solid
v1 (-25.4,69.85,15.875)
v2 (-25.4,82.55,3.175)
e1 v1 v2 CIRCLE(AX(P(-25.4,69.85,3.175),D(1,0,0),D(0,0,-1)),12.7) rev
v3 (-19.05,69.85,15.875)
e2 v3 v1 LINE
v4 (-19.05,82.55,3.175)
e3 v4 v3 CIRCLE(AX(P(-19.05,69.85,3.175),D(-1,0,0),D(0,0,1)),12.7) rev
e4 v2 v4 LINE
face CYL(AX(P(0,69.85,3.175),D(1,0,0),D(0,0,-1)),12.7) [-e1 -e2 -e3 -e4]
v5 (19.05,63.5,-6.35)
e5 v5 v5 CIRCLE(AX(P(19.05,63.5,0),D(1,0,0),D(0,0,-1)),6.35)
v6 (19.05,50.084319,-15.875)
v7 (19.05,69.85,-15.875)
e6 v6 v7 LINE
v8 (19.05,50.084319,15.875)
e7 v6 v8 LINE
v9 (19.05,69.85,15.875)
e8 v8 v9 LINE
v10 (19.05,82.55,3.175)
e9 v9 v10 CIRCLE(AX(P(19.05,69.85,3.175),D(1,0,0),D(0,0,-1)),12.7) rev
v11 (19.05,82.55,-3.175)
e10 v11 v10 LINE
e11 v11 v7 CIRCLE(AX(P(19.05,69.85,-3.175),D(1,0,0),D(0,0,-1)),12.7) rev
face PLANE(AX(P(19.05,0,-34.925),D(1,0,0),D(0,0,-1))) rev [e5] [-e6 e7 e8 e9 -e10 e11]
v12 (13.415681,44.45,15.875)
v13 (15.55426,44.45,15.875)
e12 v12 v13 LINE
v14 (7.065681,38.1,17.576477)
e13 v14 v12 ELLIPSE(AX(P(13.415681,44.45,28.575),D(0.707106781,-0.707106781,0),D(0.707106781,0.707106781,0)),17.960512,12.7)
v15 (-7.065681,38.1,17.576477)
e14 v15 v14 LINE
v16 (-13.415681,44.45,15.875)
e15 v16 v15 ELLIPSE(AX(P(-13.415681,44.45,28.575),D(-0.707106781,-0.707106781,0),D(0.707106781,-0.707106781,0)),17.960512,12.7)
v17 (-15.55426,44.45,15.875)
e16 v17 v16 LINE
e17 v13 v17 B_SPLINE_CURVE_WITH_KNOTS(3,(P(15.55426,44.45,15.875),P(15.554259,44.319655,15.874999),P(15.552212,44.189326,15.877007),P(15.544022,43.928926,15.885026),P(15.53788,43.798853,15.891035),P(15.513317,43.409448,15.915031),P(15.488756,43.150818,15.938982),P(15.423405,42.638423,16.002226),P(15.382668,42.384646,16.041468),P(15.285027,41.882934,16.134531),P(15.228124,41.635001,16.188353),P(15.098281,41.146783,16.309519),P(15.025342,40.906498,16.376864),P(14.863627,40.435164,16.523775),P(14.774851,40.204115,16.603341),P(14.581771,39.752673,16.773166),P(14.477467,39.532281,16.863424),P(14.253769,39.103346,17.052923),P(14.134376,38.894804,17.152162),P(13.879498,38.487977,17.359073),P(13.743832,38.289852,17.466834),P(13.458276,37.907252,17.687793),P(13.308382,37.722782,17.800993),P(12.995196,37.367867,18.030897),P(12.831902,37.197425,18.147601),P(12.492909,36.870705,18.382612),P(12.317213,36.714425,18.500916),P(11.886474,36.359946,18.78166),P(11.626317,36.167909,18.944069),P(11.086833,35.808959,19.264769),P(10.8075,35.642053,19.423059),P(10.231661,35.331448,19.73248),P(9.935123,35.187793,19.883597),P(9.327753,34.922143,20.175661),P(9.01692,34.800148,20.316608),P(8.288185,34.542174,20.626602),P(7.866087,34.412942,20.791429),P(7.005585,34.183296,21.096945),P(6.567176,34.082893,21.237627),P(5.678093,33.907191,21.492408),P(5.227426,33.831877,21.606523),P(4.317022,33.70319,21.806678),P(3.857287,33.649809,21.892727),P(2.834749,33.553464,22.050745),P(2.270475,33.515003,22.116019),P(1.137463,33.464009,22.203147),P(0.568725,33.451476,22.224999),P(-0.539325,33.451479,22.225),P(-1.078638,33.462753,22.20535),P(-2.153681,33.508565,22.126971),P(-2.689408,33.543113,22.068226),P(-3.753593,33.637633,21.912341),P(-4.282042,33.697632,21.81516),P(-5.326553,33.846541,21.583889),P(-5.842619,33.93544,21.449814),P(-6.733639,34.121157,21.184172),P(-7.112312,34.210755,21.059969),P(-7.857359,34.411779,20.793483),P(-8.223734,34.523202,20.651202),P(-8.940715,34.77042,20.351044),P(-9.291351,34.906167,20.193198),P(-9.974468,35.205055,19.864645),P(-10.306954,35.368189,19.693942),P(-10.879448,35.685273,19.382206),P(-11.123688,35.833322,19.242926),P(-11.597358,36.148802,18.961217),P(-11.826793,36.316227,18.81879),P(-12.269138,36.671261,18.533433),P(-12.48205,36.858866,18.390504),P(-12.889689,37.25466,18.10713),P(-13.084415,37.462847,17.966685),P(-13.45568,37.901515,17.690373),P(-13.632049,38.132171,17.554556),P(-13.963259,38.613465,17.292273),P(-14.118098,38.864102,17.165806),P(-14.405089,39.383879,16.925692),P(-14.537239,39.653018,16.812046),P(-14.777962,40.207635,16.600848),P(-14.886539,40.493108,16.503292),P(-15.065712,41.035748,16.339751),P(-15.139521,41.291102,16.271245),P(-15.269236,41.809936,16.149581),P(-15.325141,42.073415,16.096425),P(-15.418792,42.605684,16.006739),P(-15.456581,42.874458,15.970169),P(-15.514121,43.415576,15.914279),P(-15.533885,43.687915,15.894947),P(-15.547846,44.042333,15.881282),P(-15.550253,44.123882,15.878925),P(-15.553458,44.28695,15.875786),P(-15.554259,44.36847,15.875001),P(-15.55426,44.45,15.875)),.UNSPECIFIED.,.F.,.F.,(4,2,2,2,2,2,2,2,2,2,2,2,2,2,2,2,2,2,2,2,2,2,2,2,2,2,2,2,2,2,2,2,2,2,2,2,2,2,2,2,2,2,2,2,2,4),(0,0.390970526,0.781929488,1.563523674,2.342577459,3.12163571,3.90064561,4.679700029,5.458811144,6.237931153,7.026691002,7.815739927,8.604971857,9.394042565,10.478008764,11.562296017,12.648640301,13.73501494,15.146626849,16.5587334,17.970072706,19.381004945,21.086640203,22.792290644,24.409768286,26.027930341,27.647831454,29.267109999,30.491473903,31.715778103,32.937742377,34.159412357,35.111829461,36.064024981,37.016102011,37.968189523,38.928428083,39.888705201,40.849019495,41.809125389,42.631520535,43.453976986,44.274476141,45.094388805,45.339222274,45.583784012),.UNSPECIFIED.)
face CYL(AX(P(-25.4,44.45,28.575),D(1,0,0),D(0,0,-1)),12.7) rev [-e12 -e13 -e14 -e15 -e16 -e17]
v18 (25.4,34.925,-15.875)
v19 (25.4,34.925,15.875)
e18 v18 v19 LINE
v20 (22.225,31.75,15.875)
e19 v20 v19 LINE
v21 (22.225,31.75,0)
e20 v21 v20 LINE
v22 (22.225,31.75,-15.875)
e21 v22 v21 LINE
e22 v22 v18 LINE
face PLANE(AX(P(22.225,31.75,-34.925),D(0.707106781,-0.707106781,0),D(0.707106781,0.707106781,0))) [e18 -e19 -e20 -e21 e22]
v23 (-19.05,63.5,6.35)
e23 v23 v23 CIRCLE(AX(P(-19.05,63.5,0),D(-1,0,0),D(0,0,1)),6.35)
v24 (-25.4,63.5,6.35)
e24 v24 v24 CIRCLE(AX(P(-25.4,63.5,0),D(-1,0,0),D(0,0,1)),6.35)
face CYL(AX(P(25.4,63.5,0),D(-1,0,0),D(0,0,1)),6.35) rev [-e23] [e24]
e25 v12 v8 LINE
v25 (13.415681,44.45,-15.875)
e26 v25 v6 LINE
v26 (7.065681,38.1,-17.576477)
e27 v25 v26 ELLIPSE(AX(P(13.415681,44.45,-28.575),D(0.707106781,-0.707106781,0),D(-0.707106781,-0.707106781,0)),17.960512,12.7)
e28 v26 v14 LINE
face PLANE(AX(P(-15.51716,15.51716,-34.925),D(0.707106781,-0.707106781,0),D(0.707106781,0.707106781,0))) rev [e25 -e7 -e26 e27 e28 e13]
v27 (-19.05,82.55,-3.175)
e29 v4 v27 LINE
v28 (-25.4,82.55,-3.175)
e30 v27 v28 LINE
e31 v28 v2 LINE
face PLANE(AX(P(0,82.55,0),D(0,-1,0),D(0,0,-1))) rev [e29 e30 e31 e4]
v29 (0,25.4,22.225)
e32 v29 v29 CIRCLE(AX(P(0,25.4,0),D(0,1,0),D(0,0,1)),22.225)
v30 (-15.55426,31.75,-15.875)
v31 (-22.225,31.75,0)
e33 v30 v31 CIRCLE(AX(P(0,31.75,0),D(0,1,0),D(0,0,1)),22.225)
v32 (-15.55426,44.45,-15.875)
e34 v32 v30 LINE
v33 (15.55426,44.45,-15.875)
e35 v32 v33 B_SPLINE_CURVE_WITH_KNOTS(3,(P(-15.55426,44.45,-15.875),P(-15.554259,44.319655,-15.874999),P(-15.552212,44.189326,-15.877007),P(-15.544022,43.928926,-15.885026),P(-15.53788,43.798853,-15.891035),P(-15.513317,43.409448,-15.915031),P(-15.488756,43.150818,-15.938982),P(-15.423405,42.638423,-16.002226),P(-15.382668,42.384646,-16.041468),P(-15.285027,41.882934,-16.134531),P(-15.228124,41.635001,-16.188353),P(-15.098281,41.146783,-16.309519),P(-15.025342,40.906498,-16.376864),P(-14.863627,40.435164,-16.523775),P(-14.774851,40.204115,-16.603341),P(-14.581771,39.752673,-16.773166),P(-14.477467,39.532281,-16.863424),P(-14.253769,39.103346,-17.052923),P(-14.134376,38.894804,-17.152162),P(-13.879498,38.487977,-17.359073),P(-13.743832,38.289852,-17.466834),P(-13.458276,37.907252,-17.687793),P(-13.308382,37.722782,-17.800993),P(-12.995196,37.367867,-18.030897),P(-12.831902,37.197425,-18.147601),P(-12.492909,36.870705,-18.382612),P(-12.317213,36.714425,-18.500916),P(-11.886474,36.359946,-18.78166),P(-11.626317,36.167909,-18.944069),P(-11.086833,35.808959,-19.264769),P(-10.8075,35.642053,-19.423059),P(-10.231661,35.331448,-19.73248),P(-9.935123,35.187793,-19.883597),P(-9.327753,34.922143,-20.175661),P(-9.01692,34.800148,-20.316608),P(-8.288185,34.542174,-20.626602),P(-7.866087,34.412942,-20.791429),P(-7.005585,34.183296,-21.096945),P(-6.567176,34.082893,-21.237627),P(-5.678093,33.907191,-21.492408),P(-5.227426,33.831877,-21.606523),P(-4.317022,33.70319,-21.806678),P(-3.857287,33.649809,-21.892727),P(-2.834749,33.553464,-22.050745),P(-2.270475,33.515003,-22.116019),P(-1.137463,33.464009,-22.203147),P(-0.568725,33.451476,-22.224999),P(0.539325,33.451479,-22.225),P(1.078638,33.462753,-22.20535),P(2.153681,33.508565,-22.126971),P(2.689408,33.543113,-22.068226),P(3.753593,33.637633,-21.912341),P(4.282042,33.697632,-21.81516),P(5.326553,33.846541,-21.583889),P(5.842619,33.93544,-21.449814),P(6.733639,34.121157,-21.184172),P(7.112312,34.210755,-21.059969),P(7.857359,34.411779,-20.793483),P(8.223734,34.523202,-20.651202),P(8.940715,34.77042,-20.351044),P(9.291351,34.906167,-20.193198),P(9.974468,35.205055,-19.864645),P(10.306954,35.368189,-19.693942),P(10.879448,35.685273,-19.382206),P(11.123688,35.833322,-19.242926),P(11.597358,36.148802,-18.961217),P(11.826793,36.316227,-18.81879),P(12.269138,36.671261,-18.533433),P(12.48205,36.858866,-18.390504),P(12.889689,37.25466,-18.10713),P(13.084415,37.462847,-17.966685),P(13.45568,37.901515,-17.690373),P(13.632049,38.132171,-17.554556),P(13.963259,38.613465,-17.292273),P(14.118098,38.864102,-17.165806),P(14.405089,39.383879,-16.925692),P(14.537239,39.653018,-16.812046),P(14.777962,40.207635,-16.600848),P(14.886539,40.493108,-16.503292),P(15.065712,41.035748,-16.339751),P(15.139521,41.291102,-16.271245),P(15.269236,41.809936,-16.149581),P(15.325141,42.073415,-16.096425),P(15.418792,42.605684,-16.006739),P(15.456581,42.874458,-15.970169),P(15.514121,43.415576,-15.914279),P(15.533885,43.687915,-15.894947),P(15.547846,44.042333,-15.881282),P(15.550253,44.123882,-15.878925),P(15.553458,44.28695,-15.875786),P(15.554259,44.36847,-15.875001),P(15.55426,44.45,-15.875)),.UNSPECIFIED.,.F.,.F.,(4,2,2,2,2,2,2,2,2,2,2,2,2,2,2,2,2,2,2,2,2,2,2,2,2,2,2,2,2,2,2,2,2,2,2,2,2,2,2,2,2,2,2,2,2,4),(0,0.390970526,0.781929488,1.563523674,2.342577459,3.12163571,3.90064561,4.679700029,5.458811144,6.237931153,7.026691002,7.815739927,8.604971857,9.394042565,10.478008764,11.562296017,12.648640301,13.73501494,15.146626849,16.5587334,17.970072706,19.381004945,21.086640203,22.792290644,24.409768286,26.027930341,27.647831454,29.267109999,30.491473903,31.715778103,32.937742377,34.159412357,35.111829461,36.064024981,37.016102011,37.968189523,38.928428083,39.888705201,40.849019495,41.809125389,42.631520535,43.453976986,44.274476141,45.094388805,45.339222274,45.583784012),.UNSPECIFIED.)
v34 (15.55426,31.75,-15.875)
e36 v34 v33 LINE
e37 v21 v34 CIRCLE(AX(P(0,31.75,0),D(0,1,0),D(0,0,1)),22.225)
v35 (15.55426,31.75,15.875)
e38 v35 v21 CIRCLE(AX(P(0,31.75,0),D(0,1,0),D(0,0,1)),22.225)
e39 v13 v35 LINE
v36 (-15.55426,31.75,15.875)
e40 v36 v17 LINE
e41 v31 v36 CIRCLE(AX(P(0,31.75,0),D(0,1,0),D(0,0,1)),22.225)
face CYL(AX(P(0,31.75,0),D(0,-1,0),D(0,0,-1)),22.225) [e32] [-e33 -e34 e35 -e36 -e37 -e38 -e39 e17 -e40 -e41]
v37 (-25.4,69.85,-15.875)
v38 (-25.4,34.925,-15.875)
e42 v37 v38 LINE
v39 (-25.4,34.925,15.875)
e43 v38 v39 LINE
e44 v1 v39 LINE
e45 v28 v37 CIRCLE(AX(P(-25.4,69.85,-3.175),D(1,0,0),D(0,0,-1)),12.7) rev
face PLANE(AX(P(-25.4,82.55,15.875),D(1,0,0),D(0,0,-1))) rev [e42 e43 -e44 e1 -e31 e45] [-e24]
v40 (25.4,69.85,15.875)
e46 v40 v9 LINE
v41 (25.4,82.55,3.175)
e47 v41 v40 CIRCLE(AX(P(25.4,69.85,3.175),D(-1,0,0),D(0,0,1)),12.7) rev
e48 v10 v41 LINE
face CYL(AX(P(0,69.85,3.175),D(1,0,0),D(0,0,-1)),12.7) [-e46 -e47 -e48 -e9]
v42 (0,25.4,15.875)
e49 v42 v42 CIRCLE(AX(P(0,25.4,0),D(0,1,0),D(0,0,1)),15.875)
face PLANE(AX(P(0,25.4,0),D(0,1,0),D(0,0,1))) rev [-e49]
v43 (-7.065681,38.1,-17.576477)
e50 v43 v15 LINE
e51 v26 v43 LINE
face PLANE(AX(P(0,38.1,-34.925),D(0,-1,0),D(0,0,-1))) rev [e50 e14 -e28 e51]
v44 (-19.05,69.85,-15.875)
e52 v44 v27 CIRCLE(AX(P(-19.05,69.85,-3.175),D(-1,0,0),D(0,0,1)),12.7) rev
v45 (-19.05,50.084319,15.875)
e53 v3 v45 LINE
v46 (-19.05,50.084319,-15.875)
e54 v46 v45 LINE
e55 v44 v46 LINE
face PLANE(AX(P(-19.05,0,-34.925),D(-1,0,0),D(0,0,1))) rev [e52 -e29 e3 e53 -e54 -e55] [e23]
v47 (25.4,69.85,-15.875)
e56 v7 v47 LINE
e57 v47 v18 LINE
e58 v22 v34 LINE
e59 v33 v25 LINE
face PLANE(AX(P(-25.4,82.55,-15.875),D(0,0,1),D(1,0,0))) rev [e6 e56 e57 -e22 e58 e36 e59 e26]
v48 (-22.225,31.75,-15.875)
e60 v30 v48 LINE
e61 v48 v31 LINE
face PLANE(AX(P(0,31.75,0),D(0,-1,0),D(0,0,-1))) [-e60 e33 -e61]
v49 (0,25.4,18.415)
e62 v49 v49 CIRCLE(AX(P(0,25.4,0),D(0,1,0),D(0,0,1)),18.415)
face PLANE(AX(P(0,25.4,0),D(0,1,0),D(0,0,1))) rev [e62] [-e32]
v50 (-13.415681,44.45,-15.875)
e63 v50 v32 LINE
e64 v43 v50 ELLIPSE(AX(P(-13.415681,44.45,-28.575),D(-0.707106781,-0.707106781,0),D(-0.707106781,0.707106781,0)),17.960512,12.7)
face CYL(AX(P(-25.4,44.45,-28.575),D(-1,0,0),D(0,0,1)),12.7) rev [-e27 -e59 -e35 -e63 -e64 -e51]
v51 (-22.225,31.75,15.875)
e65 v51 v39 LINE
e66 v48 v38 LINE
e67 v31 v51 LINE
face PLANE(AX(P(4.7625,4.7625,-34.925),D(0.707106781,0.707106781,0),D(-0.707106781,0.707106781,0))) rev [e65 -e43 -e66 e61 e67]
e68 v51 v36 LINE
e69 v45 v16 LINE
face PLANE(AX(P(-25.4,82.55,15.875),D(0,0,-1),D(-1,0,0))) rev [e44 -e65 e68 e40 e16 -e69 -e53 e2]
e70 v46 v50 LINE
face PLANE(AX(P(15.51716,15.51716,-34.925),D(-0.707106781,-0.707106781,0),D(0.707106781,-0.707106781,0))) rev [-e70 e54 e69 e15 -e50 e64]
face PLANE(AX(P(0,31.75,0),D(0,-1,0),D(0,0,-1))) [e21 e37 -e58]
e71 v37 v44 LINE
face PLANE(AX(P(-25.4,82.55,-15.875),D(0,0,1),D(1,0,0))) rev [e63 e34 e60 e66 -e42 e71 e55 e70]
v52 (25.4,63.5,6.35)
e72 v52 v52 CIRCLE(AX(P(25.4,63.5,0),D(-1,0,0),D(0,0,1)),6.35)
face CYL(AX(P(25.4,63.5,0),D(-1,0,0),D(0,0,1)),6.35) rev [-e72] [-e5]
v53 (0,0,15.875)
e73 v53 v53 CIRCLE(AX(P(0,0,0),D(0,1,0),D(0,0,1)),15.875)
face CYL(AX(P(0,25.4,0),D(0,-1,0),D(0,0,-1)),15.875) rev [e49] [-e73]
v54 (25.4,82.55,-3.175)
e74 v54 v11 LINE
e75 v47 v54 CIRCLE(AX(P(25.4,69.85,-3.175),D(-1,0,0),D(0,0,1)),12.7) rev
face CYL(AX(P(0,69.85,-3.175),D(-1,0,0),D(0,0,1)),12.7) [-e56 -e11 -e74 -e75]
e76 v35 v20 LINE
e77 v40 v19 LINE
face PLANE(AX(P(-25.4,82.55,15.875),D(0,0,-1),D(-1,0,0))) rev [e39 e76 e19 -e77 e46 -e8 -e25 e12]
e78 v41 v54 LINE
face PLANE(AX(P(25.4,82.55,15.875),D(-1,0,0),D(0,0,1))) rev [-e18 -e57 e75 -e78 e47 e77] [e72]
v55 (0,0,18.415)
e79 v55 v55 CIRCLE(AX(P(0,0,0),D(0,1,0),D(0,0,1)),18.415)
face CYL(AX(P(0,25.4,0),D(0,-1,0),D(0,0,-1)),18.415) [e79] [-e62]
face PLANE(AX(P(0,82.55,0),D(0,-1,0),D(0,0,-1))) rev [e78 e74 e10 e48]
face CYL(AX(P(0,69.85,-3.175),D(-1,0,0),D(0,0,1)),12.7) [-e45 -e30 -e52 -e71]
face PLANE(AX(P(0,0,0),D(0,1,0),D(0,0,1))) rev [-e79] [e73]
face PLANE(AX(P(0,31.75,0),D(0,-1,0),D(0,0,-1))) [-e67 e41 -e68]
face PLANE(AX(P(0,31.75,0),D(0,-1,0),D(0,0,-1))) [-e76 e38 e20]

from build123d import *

# Parameters (mm, degrees)
SKETCH2_R           = 18.415
SKETCH2_R_2         = 15.875
BOSS_EXTRUDE1_DEPTH = 25.4
SKETCH3_R           = 22.225
BOSS_EXTRUDE2_DEPTH = 6.35
SKETCH5_W           = 50.8
SKETCH5_H           = 31.75
BOSS_EXTRUDE3_DEPTH = 50.8
CUT_EXTRUDE2_DEPTH  = 50.8
FILLET1_R           = 12.7
SKETCH9_R           = 6.35
CUT_EXTRUDE3_DEPTH  = 100.443919497
FILLET2_R           = 12.7


with BuildPart() as part:
    # Sketch2 → Boss-Extrude1 (new body)
    with BuildSketch(Plane(origin=(0, 0, 0), x_dir=(1, 0, 0), z_dir=(0, 1, 0))):
        with Locations(Location((0, 0, 0), (0, 0, 270))):
            Circle(SKETCH2_R)
        with Locations(Location((0, 0, 0), (0, 0, 270))):
            Circle(SKETCH2_R_2, mode=Mode.SUBTRACT)
    extrude(amount=BOSS_EXTRUDE1_DEPTH)

    # Sketch3 → Boss-Extrude2 (add)
    with BuildSketch(Plane(origin=(0, 25.4, 0), x_dir=(1, 0, 0), z_dir=(0, 1, 0))):
        with Locations(Location((0, 0, 0), (0, 0, 270))):
            Circle(SKETCH3_R)
    extrude(amount=BOSS_EXTRUDE2_DEPTH)

    # Sketch5 → Boss-Extrude3 (add)
    with BuildSketch(Plane(origin=(0, 31.75, 0), x_dir=(1, 0, 0), z_dir=(0, 1, 0))):
        Rectangle(SKETCH5_W, SKETCH5_H)
    extrude(amount=BOSS_EXTRUDE3_DEPTH)

    # Sketch7 → Cut-Extrude2 (cut)
    with BuildSketch(Plane.XY.offset(15.875)):
        Polygon((19.05, 82.55), (-19.05, 82.55), (-19.05, 50.084319149), (-7.065680851, 38.1), (7.065680851, 38.1), (19.05, 50.084319149), align=None)
        Polygon((-22.225, 31.75), (-25.4, 34.925), (-25.4, 31.75), align=None)
        Polygon((22.225, 31.75), (25.4, 34.925), (25.4, 31.75), align=None)
    extrude(amount=-CUT_EXTRUDE2_DEPTH, mode=Mode.SUBTRACT)

    # Fillet1
    fillet1_edges = [part.edges().sort_by_distance(p)[0] for p in [
        (22.225, 82.55, -15.875),
        (-22.225, 82.55, 15.875),
        (-22.225, 82.55, -15.875),
        (22.225, 82.55, 15.875),
    ]]
    fillet(fillet1_edges, radius=FILLET1_R)

    # Sketch9 → Cut-Extrude3 (cut, through all)
    with BuildSketch(Plane.ZY.offset(25.4)):
        with Locations((0, 63.5)):
            Circle(SKETCH9_R)
    extrude(amount=-CUT_EXTRUDE3_DEPTH, mode=Mode.SUBTRACT)

    # Fillet2
    # the kernel refuses this fillet: 12.7 mm, written as the material it adds along each edge
    with BuildSketch(Plane(origin=(-47.304259867, 31.75, 15.875), x_dir=(0, 1, 0), z_dir=(1, 0, 0))) as fillet2_piece_1_section:
        with BuildLine():
            CenterArc((FILLET2_R, FILLET2_R), FILLET2_R, 180, 90)
            Line((0, FILLET2_R), (0, 0))
            Line((0, 0), (FILLET2_R, 0))
        make_face()
    fillet2_piece_1 = extrude(amount=94.608519733, mode=Mode.PRIVATE)
    fillet2_piece_1 = split(fillet2_piece_1, bisect_by=Plane(origin=(-10.08116257, 41.115481719, 16.394719063), z_dir=(-0.7071067811865479, -0.7071067811865472, 0)), keep=Keep.TOP, mode=Mode.PRIVATE)
    fillet2_piece_1 = fillet2_piece_1 & Plane(origin=(0, 39.477824878, 0), x_dir=(0, 0, 1), z_dir=(0, -1, 0)) * Cylinder(22.225, 241, mode=Mode.PRIVATE)
    add(fillet2_piece_1)
    with BuildSketch(Plane(origin=(-47.304259867, 31.75, 15.875), x_dir=(0, 1, 0), z_dir=(1, 0, 0))) as fillet2_piece_2_section:
        with BuildLine():
            CenterArc((FILLET2_R, FILLET2_R), FILLET2_R, 180, 90)
            Line((0, FILLET2_R), (0, 0))
            Line((0, 0), (FILLET2_R, 0))
        make_face()
    fillet2_piece_2 = extrude(amount=94.608519733, mode=Mode.PRIVATE)
    fillet2_piece_2 = split(fillet2_piece_2, bisect_by=Plane(origin=(1e-09, 38.1, 17.97624181), z_dir=(0, -1, 0)), keep=Keep.TOP, mode=Mode.PRIVATE)
    fillet2_piece_2 = fillet2_piece_2 & Plane(origin=(0, 35.120576784, 0), x_dir=(0, 0, 1), z_dir=(0, -1, 0)) * Cylinder(22.225, 241, mode=Mode.PRIVATE)
    add(fillet2_piece_2)
    with BuildSketch(Plane(origin=(-47.304259867, 31.75, 15.875), x_dir=(0, 1, 0), z_dir=(1, 0, 0))) as fillet2_piece_3_section:
        with BuildLine():
            CenterArc((FILLET2_R, FILLET2_R), FILLET2_R, 180, 90)
            Line((0, FILLET2_R), (0, 0))
            Line((0, 0), (FILLET2_R, 0))
        make_face()
    fillet2_piece_3 = extrude(amount=94.608519733, mode=Mode.PRIVATE)
    fillet2_piece_3 = split(fillet2_piece_3, bisect_by=Plane(origin=(10.081162473, 41.115481622, 16.394719049), z_dir=(0.7071067811865472, -0.7071067811865478, 0)), keep=Keep.TOP, mode=Mode.PRIVATE)
    fillet2_piece_3 = fillet2_piece_3 & Plane(origin=(0, 39.477824822, 0), x_dir=(0, 0, 1), z_dir=(0, -1, 0)) * Cylinder(22.225, 241, mode=Mode.PRIVATE)
    add(fillet2_piece_3)
    with BuildSketch(Plane(origin=(47.304259867, 31.75, -15.875), x_dir=(0, 1, 0), z_dir=(-1, 0, 0))) as fillet2_piece_4_section:
        with BuildLine():
            CenterArc((FILLET2_R, FILLET2_R), FILLET2_R, 180, 90)
            Line((0, FILLET2_R), (0, 0))
            Line((0, 0), (FILLET2_R, 0))
        make_face()
    fillet2_piece_4 = extrude(amount=94.608519733, mode=Mode.PRIVATE)
    fillet2_piece_4 = split(fillet2_piece_4, bisect_by=Plane(origin=(10.08116257, 41.115481719, -16.394719063), z_dir=(0.7071067811865472, -0.7071067811865478, 0)), keep=Keep.TOP, mode=Mode.PRIVATE)
    fillet2_piece_4 = fillet2_piece_4 & Plane(origin=(0, 39.477824879, 0), x_dir=(0, 0, 1), z_dir=(0, -1, 0)) * Cylinder(22.225, 241, mode=Mode.PRIVATE)
    add(fillet2_piece_4)
    with BuildSketch(Plane(origin=(47.304259867, 31.75, -15.875), x_dir=(0, 1, 0), z_dir=(-1, 0, 0))) as fillet2_piece_5_section:
        with BuildLine():
            CenterArc((FILLET2_R, FILLET2_R), FILLET2_R, 180, 90)
            Line((0, FILLET2_R), (0, 0))
            Line((0, 0), (FILLET2_R, 0))
        make_face()
    fillet2_piece_5 = extrude(amount=94.608519733, mode=Mode.PRIVATE)
    fillet2_piece_5 = split(fillet2_piece_5, bisect_by=Plane(origin=(0, 38.1, -17.976241803), z_dir=(0, -1, 0)), keep=Keep.TOP, mode=Mode.PRIVATE)
    fillet2_piece_5 = fillet2_piece_5 & Plane(origin=(0, 35.120576783, 0), x_dir=(0, 0, 1), z_dir=(0, -1, 0)) * Cylinder(22.225, 241, mode=Mode.PRIVATE)
    add(fillet2_piece_5)
    with BuildSketch(Plane(origin=(47.304259867, 31.75, -15.875), x_dir=(0, 1, 0), z_dir=(-1, 0, 0))) as fillet2_piece_6_section:
        with BuildLine():
            CenterArc((FILLET2_R, FILLET2_R), FILLET2_R, 180, 90)
            Line((0, FILLET2_R), (0, 0))
            Line((0, 0), (FILLET2_R, 0))
        make_face()
    fillet2_piece_6 = extrude(amount=94.608519733, mode=Mode.PRIVATE)
    fillet2_piece_6 = split(fillet2_piece_6, bisect_by=Plane(origin=(-10.081162473, 41.115481622, -16.394719049), z_dir=(-0.7071067811865479, -0.7071067811865472, 0)), keep=Keep.TOP, mode=Mode.PRIVATE)
    fillet2_piece_6 = fillet2_piece_6 & Plane(origin=(0, 39.477824822, 0), x_dir=(0, 0, 1), z_dir=(0, -1, 0)) * Cylinder(22.225, 241, mode=Mode.PRIVATE)
    add(fillet2_piece_6)


solid = part.part
